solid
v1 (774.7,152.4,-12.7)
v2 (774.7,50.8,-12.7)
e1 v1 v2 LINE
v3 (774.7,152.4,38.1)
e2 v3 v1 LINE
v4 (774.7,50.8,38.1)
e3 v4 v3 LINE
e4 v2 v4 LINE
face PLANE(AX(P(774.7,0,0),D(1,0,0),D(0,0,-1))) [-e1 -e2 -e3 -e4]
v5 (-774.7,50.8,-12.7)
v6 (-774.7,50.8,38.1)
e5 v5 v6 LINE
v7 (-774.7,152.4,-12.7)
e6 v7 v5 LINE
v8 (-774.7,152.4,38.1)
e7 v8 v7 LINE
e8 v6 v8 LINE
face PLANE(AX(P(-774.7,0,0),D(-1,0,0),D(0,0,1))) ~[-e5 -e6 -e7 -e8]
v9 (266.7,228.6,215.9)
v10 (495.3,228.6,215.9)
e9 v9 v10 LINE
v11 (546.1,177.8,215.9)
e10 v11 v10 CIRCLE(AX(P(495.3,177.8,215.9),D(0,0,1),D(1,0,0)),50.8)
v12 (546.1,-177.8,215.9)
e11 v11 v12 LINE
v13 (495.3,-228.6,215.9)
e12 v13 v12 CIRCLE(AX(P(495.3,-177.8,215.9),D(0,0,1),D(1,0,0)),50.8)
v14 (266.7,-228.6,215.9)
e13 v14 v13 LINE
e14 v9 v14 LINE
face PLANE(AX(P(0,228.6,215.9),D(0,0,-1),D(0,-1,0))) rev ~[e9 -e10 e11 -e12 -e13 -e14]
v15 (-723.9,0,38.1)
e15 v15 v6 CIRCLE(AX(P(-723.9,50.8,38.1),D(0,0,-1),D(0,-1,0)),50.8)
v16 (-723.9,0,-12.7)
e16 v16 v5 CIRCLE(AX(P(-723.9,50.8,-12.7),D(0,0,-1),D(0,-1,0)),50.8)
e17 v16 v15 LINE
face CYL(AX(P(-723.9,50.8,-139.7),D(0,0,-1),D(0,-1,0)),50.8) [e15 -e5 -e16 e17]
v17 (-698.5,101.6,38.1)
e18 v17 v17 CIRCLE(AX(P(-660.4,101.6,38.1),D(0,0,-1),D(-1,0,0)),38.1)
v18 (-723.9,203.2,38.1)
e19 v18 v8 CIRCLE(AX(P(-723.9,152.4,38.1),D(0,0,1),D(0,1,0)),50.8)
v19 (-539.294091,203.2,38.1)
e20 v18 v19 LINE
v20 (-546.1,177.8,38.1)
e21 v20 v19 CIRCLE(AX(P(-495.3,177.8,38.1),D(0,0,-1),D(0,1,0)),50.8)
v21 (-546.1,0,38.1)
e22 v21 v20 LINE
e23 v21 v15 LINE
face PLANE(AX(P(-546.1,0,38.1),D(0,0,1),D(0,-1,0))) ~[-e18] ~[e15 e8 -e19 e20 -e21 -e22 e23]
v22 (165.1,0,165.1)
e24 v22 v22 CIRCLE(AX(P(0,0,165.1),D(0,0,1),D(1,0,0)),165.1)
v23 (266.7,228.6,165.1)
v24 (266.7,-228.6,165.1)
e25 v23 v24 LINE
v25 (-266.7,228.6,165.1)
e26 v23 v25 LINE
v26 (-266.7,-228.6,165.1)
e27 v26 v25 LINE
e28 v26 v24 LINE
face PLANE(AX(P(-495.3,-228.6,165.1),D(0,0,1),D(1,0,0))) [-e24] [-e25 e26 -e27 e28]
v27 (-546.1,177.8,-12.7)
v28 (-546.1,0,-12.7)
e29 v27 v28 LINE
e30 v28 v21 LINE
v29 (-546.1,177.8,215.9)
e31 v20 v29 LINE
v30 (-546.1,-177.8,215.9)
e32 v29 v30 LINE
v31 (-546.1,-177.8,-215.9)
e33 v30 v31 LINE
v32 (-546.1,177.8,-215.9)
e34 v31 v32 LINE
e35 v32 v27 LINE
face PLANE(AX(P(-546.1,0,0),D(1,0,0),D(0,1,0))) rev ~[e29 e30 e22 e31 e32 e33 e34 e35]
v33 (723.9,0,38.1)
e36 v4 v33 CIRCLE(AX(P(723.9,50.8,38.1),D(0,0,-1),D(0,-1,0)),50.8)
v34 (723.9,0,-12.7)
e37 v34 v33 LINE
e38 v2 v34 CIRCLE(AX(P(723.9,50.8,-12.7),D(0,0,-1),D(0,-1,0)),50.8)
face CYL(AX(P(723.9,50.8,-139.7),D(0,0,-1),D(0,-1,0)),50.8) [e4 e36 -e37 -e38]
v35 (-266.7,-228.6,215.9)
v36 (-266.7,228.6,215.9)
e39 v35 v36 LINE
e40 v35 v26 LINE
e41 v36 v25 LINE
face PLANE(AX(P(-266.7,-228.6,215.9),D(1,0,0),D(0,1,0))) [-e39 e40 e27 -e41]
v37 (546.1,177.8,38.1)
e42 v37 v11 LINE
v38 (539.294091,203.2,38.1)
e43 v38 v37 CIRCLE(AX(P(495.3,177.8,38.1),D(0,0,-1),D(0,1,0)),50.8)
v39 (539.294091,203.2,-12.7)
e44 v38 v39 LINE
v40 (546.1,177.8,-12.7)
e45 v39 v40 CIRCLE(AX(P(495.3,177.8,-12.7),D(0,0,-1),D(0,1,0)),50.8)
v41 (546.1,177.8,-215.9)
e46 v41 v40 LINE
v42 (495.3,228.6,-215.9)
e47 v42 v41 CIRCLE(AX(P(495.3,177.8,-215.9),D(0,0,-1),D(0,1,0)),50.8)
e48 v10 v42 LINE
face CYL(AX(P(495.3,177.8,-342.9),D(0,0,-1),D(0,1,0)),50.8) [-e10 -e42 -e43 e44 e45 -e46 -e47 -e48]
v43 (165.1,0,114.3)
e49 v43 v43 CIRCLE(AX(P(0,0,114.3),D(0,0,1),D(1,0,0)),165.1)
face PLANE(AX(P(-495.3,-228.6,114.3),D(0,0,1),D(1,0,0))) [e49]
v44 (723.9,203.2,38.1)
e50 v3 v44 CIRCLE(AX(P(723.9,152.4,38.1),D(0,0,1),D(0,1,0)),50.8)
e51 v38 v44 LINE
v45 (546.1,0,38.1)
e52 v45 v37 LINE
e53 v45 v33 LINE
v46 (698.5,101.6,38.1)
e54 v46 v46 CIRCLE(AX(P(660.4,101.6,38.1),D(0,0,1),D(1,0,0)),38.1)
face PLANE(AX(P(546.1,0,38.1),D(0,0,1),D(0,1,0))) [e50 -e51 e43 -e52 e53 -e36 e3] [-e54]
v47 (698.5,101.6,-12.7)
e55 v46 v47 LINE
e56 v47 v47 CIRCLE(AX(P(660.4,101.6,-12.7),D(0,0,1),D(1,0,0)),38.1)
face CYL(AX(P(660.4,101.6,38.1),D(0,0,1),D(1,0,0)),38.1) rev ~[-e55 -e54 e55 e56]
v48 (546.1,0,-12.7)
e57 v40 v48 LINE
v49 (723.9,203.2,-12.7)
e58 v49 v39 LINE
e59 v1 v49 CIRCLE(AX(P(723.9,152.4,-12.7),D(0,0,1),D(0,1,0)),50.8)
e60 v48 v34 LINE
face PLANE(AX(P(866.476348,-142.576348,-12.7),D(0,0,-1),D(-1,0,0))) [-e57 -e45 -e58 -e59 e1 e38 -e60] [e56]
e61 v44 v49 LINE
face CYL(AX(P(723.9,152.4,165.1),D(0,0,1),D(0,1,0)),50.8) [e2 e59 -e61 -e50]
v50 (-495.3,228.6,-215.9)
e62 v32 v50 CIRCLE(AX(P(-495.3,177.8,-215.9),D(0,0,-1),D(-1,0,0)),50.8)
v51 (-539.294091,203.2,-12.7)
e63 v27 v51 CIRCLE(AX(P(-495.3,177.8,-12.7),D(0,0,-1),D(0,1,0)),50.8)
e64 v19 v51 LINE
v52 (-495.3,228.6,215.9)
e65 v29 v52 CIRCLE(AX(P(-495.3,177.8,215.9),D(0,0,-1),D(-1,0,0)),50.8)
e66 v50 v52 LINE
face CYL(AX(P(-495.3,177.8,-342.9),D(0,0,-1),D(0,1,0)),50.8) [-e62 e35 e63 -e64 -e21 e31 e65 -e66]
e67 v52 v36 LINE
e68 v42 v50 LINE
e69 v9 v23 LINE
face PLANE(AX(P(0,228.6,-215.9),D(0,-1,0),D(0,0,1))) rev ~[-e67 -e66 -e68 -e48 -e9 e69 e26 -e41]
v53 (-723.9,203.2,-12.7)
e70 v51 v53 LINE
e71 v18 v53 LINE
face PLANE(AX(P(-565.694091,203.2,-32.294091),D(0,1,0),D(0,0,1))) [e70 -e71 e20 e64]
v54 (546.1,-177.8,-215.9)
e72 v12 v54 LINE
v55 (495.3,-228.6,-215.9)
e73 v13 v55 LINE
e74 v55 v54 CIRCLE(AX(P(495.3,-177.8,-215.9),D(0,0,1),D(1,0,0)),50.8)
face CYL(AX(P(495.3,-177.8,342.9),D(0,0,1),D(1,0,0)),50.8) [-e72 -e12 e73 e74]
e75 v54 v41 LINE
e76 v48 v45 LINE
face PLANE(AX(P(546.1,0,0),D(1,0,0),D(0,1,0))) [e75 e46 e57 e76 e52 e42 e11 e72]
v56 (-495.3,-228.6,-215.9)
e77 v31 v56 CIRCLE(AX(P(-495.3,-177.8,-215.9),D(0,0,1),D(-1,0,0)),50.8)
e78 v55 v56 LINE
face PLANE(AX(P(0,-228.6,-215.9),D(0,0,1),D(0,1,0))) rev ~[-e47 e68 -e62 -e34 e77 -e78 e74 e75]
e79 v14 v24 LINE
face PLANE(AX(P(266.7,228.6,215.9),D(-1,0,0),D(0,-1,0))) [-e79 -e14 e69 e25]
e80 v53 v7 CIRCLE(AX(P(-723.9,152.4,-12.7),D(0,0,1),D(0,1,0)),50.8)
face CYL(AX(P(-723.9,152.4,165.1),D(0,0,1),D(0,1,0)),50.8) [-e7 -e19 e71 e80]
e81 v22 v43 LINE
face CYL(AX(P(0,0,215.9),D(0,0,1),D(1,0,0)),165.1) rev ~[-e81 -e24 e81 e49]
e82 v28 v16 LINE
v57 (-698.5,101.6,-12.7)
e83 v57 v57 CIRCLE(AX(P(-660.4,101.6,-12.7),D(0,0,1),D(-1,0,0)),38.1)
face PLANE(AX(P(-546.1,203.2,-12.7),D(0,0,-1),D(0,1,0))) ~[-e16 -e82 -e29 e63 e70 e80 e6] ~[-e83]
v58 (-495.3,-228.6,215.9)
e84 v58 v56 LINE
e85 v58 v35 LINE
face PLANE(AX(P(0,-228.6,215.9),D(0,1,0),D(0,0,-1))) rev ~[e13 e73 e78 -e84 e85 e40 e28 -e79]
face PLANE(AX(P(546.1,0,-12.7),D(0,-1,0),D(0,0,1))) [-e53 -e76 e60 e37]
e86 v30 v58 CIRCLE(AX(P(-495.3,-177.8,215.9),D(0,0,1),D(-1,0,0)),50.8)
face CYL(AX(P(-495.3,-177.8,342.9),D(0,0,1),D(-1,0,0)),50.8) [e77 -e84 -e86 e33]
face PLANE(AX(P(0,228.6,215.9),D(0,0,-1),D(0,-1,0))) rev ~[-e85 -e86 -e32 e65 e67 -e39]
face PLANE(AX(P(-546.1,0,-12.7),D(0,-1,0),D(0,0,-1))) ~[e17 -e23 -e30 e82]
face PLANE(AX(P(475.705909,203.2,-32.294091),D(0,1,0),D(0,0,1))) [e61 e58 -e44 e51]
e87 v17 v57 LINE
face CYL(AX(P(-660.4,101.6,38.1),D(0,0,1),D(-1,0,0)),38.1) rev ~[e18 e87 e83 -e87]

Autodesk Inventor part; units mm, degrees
ref_plane "YZ Plane" through (0, 0, 0) normal (1, 0, 0) x (0, 1, 0)
ref_plane "XZ Plane" through (0, 0, 0) normal (0, 1, 0) x (-1, 0, 0)
ref_plane "XY Plane" through (0, 0, 0) normal (0, 0, 1) x (1, 0, 0)
sketch "Sketch1" plane through (0, 0, 0) normal (1, 0, 0) x (0, 1, 0)
  line L0 (228.6, 215.9) -> (-228.6, 215.9)
  line L1 (-228.6, 215.9) -> (-228.6, -215.9)
  line L2 (-228.6, -215.9) -> (228.6, -215.9)
  line L3 (228.6, -215.9) -> (228.6, 215.9)
  point P0 (0, 0)
  dimension "d0" = 431.8
  dimension "d1" = 457.2
  dimension "d2" = 215.9
  dimension "d3" = 228.6
extrude "Extrusion1" add sketch "Sketch1" along normal mid plane 1092.2
sketch "Sketch2" plane through (546.1, 0, 0) normal (1, 0, 0) x (0, 0, -1)
  line L0 (-38.1, 203.2) -> (12.7, 203.2)
  line L1 (12.7, 203.2) -> (12.7, 0)
  line L2 (12.7, 0) -> (-38.1, 0)
  line L3 (-38.1, 0) -> (-38.1, 203.2)
  line L4 (-215.9, 228.6) -> (-215.9, -228.6) projected
  line L5 (-215.9, 228.6) -> (215.9, 228.6) projected
  point P0 (0, 0)
  dimension "d6" = 50.8
  dimension "d7" = 203.2
  dimension "d8" = 228.6
  dimension "d9" = 25.4
extrude "Extrusion2" add sketch "Sketch2" along normal blind 228.6
mirror "Mirror1" about plane through (0, 0, 0) normal (1, 0, 0) of "Extrusion2"
sketch "Sketch3" plane through (546.1, 0, 38.1) normal (0, 0, 1) x (1, 0, 0)
  circle A0 centre (114.3, 101.6) radius 38.1
  line L0 (0, 228.6) -> (0, -228.6) projected
  line L1 (0, 203.2) -> (228.6, 203.2) projected
  point P0 (-546.1, 0)
  dimension "d12" = 76.2
  dimension "d13" = 114.3
  dimension "d14" = 101.6
extrude "Extrusion3" cut sketch "Sketch3" against normal through all
mirror "Mirror2" about plane through (0, 0, 0) normal (1, 0, 0) of "Extrusion3"
fillet "Fillet1" radius 50.8 8 edges at (774.7, 203.2, 12.7) (774.7, 0, 12.7) (546.1, 228.6, 0) (546.1, -228.6, 0) (-546.1, 228.6, 0) (-546.1, -228.6, 0) (-774.7, 203.2, 12.7) (-774.7, 0, 12.7)
sketch "Sketch4" plane through (-495.3, -228.6, 215.9) normal (0, 0, 1) x (1, 0, 0)
  circle A0 centre (495.3, 228.6) radius 165.1
  dimension "d18" = 330.2
extrude "Extrusion4" cut sketch "Sketch4" against normal blind 101.6
sketch "Sketch5" plane through (-495.3, -228.6, 215.9) normal (0, 0, 1) x (1, 0, 0)
  line L0 (990.6, 457.2) -> (0, 457.2) projected
  line L1 (0, 0) -> (990.6, 0) projected
  line L2 (228.6, 457.2) -> (762, 457.2)
  line L3 (762, 457.2) -> (762, 0)
  line L4 (762, 0) -> (228.6, 0)
  line L5 (228.6, 0) -> (228.6, 457.2)
  line L6 (1041.4, 406.4) -> (1041.4, 50.8) projected
  line L7 (-50.8, 50.8) -> (-50.8, 406.4) projected
  point P0 (495.3, 228.6)
  dimension "d21" = 279.4
  dimension "d22" = 279.4
extrude "Extrusion5" cut sketch "Sketch5" against normal blind 50.8
properties part number "Speaker"
